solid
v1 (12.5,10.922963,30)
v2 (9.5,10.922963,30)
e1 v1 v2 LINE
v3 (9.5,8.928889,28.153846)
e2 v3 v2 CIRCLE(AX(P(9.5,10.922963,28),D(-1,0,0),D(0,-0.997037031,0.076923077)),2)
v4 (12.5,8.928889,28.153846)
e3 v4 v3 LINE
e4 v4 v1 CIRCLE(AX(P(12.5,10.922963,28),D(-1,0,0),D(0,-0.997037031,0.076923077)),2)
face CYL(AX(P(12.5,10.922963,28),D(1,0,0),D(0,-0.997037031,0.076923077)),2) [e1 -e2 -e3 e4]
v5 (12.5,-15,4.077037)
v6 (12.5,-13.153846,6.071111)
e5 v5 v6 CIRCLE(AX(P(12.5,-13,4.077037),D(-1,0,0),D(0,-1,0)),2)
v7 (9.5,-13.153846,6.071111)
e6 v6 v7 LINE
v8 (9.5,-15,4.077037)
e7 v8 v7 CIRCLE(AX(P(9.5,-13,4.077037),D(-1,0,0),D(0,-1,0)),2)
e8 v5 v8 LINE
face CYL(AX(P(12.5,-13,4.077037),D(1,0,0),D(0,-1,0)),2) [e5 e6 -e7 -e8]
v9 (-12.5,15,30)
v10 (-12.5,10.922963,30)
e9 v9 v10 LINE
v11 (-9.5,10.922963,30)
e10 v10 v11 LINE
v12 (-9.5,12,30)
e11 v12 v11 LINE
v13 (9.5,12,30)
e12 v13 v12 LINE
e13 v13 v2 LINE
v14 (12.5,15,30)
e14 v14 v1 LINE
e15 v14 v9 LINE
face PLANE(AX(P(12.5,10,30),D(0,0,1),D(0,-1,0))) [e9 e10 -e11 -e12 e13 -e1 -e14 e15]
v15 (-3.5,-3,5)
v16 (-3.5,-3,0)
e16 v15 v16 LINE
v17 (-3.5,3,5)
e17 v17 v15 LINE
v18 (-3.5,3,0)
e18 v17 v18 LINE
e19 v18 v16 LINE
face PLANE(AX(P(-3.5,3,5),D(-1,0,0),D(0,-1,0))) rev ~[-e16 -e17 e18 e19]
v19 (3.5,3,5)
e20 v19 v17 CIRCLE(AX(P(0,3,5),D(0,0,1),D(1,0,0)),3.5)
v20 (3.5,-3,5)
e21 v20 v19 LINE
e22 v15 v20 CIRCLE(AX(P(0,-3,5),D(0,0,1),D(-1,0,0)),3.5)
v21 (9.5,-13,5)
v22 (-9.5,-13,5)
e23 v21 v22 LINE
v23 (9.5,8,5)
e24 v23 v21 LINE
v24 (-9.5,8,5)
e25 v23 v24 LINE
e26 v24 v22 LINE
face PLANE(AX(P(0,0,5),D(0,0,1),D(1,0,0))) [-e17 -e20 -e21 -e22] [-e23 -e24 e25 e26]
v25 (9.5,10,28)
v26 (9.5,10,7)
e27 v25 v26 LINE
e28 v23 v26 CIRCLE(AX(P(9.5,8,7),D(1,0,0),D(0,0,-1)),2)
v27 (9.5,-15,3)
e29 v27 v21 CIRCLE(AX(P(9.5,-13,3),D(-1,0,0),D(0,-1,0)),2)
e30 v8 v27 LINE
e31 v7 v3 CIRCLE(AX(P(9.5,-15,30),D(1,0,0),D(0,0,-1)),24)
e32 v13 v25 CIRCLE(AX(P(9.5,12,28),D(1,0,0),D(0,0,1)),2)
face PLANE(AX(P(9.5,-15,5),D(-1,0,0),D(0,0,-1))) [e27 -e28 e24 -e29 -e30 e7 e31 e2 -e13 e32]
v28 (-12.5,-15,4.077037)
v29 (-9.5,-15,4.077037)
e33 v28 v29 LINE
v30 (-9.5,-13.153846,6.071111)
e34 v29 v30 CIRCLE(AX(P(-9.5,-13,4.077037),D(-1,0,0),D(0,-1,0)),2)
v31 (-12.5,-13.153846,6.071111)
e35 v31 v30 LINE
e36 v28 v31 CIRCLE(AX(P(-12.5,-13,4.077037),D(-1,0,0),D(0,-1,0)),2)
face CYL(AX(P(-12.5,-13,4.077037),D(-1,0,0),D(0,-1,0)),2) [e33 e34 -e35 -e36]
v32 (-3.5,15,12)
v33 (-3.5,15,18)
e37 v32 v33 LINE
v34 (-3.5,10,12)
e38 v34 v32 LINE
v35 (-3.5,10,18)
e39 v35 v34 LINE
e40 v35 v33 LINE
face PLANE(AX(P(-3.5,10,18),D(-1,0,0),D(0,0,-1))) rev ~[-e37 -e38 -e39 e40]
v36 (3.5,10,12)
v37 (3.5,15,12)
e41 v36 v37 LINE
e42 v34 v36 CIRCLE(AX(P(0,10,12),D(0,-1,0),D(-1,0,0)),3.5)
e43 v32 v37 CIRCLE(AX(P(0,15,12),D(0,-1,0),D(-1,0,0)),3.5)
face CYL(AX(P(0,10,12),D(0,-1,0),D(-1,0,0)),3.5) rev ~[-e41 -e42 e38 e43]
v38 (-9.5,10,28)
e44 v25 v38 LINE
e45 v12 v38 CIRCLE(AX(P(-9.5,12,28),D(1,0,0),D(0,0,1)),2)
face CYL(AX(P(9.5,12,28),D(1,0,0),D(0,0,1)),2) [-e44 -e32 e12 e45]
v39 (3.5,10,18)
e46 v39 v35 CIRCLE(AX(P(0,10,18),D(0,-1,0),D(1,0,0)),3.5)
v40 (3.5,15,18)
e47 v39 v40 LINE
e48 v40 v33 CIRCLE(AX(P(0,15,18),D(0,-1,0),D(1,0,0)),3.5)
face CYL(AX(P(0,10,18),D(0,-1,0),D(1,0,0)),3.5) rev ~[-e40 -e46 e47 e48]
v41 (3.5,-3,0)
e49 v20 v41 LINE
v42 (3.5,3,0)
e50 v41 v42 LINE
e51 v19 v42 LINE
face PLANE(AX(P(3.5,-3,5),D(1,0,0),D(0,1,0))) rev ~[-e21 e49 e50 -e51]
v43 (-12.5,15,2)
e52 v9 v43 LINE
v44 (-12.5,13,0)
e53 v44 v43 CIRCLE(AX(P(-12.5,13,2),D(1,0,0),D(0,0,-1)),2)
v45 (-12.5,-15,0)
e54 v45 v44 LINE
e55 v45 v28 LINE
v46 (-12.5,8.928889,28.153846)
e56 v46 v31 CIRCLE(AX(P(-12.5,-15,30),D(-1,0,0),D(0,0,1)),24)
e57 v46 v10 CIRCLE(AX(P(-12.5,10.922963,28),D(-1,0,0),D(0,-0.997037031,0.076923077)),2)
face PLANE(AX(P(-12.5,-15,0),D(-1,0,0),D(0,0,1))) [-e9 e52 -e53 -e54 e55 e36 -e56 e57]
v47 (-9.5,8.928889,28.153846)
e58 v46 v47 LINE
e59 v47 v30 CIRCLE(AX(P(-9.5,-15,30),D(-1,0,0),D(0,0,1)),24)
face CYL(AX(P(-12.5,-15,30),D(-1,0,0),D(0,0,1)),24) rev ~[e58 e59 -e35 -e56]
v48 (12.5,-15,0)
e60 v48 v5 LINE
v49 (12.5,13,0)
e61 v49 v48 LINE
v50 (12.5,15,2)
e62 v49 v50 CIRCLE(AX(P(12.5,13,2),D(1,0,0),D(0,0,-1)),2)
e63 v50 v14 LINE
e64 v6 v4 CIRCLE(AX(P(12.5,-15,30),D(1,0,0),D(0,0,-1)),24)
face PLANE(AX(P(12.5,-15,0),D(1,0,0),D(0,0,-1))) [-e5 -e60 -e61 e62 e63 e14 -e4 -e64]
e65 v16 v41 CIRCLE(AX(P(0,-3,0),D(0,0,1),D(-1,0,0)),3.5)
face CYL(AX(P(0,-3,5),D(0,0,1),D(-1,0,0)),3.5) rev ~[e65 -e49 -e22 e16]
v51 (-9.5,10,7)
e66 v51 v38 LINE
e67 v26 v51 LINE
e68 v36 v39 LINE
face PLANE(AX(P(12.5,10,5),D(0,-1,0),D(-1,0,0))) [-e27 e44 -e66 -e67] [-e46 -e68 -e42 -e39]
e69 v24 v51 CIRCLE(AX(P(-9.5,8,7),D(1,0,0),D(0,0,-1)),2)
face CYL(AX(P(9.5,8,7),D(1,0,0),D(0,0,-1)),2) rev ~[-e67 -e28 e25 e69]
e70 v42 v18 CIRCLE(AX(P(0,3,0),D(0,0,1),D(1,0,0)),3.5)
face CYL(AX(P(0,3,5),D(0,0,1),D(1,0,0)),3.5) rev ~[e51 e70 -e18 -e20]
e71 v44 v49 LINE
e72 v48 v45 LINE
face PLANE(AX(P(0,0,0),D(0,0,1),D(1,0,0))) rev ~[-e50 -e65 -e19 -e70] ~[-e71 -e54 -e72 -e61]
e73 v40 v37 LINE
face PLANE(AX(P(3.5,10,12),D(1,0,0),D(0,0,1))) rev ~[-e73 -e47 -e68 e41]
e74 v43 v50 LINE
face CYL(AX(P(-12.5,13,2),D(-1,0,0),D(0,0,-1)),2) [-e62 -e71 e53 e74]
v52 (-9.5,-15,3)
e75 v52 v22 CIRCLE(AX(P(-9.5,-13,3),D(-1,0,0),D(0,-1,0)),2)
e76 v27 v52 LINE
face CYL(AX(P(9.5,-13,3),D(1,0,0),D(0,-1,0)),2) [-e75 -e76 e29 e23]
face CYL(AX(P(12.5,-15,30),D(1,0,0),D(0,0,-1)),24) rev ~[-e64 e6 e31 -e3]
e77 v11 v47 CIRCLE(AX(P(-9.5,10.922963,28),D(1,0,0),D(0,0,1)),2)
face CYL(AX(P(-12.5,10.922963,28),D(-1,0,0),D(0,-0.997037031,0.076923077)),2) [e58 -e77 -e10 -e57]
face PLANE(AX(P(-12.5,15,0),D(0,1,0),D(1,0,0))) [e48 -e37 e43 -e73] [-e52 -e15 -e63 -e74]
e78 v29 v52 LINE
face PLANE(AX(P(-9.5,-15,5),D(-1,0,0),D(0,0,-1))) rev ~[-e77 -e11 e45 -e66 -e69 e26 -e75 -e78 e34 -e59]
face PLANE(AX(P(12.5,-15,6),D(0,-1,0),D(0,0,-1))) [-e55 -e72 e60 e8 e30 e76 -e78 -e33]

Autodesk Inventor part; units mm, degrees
ref_plane "YZ Plane" through (0, 0, 0) normal (1, 0, 0) x (0, 1, 0)
ref_plane "XZ Plane" through (0, 0, 0) normal (0, 1, 0) x (-1, 0, 0)
ref_plane "XY Plane" through (0, 0, 0) normal (0, 0, 1) x (1, 0, 0)
sketch "스케치1" plane through (0, 0, 0) normal (0, 0, 1) x (1, 0, 0)
  line L0 (12.5, -15) -> (-12.5, -15)
  line L1 (-12.5, -15) -> (-12.5, 15)
  line L2 (-12.5, 15) -> (12.5, 15)
  line L3 (12.5, 15) -> (12.5, -15)
  line L4 (12.5, -15) -> (-12.5, 15) construction
  line L5 (-12.5, -15) -> (12.5, 15) construction
  point P0 (0, 0)
  dimension "d0" = 25
  dimension "d1" = 30
extrude "돌출1" add sketch "스케치1" along normal blind 5
sketch "스케치2" plane through (0, 0, 5) normal (0, 0, 1) x (1, 0, 0)
  line L0 (12.5, 15) -> (-12.5, 15) projected
  line L1 (12.5, -15) -> (12.5, 15) projected
  line L2 (-12.5, 15) -> (12.5, 15)
  line L3 (12.5, 15) -> (12.5, 10)
  line L4 (12.5, 10) -> (-12.5, 10)
  line L5 (-12.5, 10) -> (-12.5, 15)
  point P0 (0, 0)
  dimension "d4" = 5
extrude "돌출2" add sketch "스케치2" along normal blind 25
sketch "스케치3" plane through (0, 0, 5) normal (0, 0, 1) x (1, 0, 0)
  line L0 (0, -3) -> (0, 3) construction
  line L1 (3.5, -3) -> (3.5, 3)
  line L2 (-3.5, 3) -> (-3.5, -3)
  arc A0 (-3.5, -3) -> (3.5, -3) centre (0, -3) ccw
  arc A1 (3.5, 3) -> (-3.5, 3) centre (0, 3) ccw
  point P0 (0, 0)
  dimension "d7" = 3
  dimension "d8" = 7
extrude "돌출3" cut sketch "스케치3" against normal through all
sketch "스케치4" plane through (-12.5, 10, 5) normal (0, -1, 0) x (1, 0, 0)
  line L0 (25, 0) -> (0, 0) projected
  line L1 (0, 0) -> (12.5, 0)
  line L2 (12.5, 7) -> (12.5, 13) construction
  line L3 (16, 7) -> (16, 13)
  line L4 (9, 13) -> (9, 7)
  arc A0 (9, 7) -> (16, 7) centre (12.5, 7) ccw
  arc A1 (16, 13) -> (9, 13) centre (12.5, 13) ccw
  point P0 (12.5, -5)
  dimension "d14" = 7
extrude "돌출4" cut sketch "스케치4" against normal through all
sketch "스케치5" plane through (-12.5, -15, 0) normal (-1, 0, 0) x (0, 0, 1)
  line L0 (0, 30) -> (0, 0) projected
  line L1 (0, 0) -> (5, 0) projected
  line L2 (5, 25) -> (5, 0) projected
  line L3 (5, 25) -> (30, 25) projected
  line L4 (30, 30) -> (30, 25) projected
  line L5 (0, 30) -> (30, 30) projected
  line L6 (0, 0) -> (0, 30) projected
  line L7 (0, 30) -> (30, 30) projected
  line L8 (0, 0) -> (30, 0)
  line L9 (30, 0) -> (30, 30)
  line L10 (30, 30) -> (0, 30)
  line L11 (0, 30) -> (0, 0)
  line L12 (5, 0) -> (6, 0)
  line L13 (30, 25) -> (30, 24)
  line L14 (30, 24) -> (6, 0)
  circle A0 centre (30, 0) radius 24
  point P0 (0, 15)
  dimension "d17" = 1
  dimension "d18" = 1
extrude "돌출5" add sketch "스케치5" against normal blind 3 contours L2 L3 L9 A0 L8
sketch "스케치6" plane through (12.5, -15, 0) normal (1, 0, 0) x (0, 0, -1)
  line L0 (-30, 25) -> (-5, 25) projected
  line L1 (-30, 25) -> (-30, 24) projected
  arc A0 (-6, 0) -> (-30, 24) centre (-30, 0) ccw projected
  line L2 (-6, 0) -> (-5, 0) projected
  line L3 (-5, 25) -> (-5, 0) projected
  point P0 (0, 15)
extrude "돌출6" add sketch "스케치6" against normal blind 3
fillet "모깎기1" radius 2 8 edges at (-11, -15, 6) (0, -15, 5) (11, -15, 6) (0, 10, 30) (-11, 9, 30) (11, 9, 30) (0, 10, 5) (0, 15, 0)
properties part number "braket2"
